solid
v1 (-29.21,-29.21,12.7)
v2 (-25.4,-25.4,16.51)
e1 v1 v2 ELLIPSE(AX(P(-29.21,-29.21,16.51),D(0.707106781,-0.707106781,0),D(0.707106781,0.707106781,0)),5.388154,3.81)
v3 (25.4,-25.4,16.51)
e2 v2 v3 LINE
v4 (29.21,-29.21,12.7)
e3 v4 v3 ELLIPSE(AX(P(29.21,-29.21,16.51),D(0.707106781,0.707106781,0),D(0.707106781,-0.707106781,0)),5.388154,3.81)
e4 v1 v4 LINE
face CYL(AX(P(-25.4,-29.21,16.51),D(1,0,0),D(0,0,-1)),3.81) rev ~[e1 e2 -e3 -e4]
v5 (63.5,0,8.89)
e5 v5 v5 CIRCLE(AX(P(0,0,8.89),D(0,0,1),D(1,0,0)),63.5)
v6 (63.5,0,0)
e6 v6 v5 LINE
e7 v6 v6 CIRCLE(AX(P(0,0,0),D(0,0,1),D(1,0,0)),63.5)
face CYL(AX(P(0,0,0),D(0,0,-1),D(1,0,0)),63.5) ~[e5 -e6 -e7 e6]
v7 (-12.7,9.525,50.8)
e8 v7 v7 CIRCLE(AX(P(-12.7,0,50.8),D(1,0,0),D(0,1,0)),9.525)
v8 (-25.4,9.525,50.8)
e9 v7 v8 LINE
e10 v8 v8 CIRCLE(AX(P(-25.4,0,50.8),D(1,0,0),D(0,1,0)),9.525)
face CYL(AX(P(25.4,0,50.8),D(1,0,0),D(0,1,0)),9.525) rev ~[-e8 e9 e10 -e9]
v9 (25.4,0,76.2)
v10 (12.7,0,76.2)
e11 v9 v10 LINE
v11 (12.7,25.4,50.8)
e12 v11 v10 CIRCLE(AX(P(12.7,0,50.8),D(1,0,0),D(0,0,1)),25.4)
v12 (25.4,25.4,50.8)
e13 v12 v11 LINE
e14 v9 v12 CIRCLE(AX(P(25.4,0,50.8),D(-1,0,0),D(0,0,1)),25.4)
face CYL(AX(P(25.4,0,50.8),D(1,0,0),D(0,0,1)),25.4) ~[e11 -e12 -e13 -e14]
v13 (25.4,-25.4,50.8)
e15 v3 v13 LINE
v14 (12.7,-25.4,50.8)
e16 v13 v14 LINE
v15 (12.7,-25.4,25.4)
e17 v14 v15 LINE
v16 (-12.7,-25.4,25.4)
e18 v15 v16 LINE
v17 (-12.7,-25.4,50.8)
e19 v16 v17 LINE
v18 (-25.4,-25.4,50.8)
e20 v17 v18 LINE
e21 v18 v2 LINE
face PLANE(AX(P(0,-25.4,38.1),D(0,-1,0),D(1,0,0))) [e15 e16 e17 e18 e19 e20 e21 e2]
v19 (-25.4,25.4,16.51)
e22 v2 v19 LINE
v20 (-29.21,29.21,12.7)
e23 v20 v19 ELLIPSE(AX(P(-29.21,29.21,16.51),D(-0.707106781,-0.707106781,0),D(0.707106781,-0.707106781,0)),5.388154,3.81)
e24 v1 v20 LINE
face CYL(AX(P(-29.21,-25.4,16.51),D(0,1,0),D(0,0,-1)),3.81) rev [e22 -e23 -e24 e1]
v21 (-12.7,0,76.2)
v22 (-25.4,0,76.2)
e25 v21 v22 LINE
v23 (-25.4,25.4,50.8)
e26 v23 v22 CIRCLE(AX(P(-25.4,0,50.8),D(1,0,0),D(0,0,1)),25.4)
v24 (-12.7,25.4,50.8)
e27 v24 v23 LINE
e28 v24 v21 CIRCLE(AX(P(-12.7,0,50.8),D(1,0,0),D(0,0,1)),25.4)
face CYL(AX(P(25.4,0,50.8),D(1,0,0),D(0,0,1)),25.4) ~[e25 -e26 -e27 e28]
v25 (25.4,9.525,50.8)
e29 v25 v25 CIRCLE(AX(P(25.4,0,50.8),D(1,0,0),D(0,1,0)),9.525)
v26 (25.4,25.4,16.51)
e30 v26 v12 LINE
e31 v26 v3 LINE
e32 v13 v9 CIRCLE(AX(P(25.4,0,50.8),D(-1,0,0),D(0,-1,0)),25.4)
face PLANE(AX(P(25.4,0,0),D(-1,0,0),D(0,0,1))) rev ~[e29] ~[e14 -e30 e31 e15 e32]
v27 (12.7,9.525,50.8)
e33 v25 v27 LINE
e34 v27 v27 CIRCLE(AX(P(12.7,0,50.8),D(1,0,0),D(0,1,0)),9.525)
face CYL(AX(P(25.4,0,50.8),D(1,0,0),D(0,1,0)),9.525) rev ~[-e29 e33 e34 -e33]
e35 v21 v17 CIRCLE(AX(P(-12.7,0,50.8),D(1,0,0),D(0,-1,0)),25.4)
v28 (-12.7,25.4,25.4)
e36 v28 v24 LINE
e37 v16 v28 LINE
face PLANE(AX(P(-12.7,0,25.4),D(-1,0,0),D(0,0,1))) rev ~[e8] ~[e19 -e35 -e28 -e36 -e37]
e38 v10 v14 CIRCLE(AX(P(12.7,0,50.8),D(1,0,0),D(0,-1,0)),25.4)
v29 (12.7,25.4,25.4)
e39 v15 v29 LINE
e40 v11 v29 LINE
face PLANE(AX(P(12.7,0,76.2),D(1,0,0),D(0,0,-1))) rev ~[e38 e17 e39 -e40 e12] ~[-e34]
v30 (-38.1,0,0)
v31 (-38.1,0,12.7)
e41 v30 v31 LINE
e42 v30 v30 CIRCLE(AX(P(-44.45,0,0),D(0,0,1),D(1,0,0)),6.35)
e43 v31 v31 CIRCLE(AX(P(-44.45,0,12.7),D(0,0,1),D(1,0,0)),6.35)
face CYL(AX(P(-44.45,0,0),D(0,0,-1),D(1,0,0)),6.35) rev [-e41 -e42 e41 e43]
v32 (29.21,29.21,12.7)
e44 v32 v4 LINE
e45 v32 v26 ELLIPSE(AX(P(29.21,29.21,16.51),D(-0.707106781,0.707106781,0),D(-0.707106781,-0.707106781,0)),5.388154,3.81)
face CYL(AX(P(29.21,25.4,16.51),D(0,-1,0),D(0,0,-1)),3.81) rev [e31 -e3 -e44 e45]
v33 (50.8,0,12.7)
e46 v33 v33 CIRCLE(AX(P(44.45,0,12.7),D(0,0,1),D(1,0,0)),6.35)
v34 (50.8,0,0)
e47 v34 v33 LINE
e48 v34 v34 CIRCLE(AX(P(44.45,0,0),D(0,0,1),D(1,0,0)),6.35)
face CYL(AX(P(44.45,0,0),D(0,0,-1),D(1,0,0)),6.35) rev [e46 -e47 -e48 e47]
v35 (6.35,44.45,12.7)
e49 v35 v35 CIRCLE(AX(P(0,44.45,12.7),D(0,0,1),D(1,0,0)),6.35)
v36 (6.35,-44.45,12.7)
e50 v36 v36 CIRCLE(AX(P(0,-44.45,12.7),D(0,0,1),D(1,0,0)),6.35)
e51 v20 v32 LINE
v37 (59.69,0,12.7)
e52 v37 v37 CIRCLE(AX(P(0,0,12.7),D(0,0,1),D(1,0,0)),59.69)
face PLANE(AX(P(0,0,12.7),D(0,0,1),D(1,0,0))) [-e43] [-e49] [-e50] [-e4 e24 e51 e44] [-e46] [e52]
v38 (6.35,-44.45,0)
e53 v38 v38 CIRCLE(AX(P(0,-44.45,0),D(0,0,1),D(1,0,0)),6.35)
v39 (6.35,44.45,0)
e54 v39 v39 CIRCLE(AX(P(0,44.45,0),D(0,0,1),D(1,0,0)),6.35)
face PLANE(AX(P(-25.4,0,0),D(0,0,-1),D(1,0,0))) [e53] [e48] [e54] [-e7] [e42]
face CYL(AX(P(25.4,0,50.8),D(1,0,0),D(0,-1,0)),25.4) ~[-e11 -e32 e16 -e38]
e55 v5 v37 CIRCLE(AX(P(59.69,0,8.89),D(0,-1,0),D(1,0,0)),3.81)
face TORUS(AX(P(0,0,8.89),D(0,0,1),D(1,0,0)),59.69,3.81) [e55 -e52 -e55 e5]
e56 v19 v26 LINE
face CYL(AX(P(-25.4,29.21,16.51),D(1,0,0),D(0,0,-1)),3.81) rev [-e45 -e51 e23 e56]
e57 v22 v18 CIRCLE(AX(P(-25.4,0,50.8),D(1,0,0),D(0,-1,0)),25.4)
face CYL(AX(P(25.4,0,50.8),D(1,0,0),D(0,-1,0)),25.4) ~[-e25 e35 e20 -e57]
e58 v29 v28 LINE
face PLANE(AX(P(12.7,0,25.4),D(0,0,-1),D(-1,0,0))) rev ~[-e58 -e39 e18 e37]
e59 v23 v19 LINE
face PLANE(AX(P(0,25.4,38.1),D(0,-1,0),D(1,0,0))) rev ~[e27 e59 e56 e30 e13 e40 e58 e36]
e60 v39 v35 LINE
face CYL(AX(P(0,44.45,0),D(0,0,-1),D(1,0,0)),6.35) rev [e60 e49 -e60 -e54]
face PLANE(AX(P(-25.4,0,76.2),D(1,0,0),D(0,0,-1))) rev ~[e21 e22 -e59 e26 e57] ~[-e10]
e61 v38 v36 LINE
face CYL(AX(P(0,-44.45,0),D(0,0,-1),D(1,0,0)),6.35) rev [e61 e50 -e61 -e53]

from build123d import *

# Parameters (mm, degrees)
F0_R          = 63.5
F0_R_2        = 6.35
F1_DEPTH      = 12.7
F3_DEPTH      = 25.4
F3_DEPTH_BACK = 25.4
F4_R          = 9.525
F5_DEPTH      = 88.901
F6_DEPTH      = 88.901
F7_R          = 3.81
F8_R          = 3.81


# Not quite as in the source:
# - a feature names something its author has since deleted; it is built from what else it names


with BuildPart() as f1:
    # F0 (on Top) → F1 (new body)
    with BuildSketch(Plane.XY):
        Circle(F0_R)
        with Locations((0, -44.45)):
            Circle(F0_R_2, mode=Mode.SUBTRACT)
        with Locations((-44.45, 0)):
            Circle(F0_R_2, mode=Mode.SUBTRACT)
        with Locations((44.45, 0)):
            Circle(F0_R_2, mode=Mode.SUBTRACT)
        with Locations((0, 44.45)):
            Circle(F0_R_2, mode=Mode.SUBTRACT)
    extrude(amount=F1_DEPTH)

    # F2 (on Front) → F3 (join, two sides)
    with BuildSketch(Plane.XZ) as f3_sk:
        Polygon((-25.4, 0), (0, 0), (25.4, 0), (25.4, 76.2), (12.7, 76.2), (12.7, 25.4), (0, 25.4), (-12.7, 25.4), (-12.7, 76.2), (-25.4, 76.2), align=None)
    extrude(amount=F3_DEPTH)
    extrude(f3_sk.sketch, amount=-F3_DEPTH_BACK)

    # F4 (on face) → F5 (cut, through all)
    with BuildSketch(Plane.YZ.offset(25.4)):
        with Locations((0, 50.8)):
            Circle(F4_R)
    extrude(amount=-F5_DEPTH, mode=Mode.SUBTRACT)

    # F4 (on face) → F6 (cut, through all)
    with BuildSketch(Plane.YZ.offset(25.4)):
        with BuildLine():
            Line((-25.4, 76.2), (-25.4, 50.8))
            ThreePointArc((-25.4, 50.8), (-17.9605122421, 68.7605122421), (0, 76.2))
            Line((0, 76.2), (-25.4, 76.2))
        make_face()
        with BuildLine():
            Line((25.4, 76.2), (0, 76.2))
            ThreePointArc((0, 76.2), (17.9605122421, 68.7605122421), (25.4, 50.8))
            Line((25.4, 50.8), (25.4, 76.2))
        make_face()
    extrude(amount=-F6_DEPTH, mode=Mode.SUBTRACT)

    # F7
    f7_edges = [f1.edges().sort_by_distance(p)[0] for p in [
        (-63.5, 0, 12.7),
    ]]
    fillet(f7_edges, radius=F7_R)

    # F8
    f8_edges = [f1.edges().sort_by_distance(p)[0] for p in [
        (0, -25.4, 12.7),
        (25.4, 0, 12.7),
        (0, 25.4, 12.7),
        (-25.4, 0, 12.7),
    ]]
    fillet(f8_edges, radius=F8_R)


solid = f1.part
